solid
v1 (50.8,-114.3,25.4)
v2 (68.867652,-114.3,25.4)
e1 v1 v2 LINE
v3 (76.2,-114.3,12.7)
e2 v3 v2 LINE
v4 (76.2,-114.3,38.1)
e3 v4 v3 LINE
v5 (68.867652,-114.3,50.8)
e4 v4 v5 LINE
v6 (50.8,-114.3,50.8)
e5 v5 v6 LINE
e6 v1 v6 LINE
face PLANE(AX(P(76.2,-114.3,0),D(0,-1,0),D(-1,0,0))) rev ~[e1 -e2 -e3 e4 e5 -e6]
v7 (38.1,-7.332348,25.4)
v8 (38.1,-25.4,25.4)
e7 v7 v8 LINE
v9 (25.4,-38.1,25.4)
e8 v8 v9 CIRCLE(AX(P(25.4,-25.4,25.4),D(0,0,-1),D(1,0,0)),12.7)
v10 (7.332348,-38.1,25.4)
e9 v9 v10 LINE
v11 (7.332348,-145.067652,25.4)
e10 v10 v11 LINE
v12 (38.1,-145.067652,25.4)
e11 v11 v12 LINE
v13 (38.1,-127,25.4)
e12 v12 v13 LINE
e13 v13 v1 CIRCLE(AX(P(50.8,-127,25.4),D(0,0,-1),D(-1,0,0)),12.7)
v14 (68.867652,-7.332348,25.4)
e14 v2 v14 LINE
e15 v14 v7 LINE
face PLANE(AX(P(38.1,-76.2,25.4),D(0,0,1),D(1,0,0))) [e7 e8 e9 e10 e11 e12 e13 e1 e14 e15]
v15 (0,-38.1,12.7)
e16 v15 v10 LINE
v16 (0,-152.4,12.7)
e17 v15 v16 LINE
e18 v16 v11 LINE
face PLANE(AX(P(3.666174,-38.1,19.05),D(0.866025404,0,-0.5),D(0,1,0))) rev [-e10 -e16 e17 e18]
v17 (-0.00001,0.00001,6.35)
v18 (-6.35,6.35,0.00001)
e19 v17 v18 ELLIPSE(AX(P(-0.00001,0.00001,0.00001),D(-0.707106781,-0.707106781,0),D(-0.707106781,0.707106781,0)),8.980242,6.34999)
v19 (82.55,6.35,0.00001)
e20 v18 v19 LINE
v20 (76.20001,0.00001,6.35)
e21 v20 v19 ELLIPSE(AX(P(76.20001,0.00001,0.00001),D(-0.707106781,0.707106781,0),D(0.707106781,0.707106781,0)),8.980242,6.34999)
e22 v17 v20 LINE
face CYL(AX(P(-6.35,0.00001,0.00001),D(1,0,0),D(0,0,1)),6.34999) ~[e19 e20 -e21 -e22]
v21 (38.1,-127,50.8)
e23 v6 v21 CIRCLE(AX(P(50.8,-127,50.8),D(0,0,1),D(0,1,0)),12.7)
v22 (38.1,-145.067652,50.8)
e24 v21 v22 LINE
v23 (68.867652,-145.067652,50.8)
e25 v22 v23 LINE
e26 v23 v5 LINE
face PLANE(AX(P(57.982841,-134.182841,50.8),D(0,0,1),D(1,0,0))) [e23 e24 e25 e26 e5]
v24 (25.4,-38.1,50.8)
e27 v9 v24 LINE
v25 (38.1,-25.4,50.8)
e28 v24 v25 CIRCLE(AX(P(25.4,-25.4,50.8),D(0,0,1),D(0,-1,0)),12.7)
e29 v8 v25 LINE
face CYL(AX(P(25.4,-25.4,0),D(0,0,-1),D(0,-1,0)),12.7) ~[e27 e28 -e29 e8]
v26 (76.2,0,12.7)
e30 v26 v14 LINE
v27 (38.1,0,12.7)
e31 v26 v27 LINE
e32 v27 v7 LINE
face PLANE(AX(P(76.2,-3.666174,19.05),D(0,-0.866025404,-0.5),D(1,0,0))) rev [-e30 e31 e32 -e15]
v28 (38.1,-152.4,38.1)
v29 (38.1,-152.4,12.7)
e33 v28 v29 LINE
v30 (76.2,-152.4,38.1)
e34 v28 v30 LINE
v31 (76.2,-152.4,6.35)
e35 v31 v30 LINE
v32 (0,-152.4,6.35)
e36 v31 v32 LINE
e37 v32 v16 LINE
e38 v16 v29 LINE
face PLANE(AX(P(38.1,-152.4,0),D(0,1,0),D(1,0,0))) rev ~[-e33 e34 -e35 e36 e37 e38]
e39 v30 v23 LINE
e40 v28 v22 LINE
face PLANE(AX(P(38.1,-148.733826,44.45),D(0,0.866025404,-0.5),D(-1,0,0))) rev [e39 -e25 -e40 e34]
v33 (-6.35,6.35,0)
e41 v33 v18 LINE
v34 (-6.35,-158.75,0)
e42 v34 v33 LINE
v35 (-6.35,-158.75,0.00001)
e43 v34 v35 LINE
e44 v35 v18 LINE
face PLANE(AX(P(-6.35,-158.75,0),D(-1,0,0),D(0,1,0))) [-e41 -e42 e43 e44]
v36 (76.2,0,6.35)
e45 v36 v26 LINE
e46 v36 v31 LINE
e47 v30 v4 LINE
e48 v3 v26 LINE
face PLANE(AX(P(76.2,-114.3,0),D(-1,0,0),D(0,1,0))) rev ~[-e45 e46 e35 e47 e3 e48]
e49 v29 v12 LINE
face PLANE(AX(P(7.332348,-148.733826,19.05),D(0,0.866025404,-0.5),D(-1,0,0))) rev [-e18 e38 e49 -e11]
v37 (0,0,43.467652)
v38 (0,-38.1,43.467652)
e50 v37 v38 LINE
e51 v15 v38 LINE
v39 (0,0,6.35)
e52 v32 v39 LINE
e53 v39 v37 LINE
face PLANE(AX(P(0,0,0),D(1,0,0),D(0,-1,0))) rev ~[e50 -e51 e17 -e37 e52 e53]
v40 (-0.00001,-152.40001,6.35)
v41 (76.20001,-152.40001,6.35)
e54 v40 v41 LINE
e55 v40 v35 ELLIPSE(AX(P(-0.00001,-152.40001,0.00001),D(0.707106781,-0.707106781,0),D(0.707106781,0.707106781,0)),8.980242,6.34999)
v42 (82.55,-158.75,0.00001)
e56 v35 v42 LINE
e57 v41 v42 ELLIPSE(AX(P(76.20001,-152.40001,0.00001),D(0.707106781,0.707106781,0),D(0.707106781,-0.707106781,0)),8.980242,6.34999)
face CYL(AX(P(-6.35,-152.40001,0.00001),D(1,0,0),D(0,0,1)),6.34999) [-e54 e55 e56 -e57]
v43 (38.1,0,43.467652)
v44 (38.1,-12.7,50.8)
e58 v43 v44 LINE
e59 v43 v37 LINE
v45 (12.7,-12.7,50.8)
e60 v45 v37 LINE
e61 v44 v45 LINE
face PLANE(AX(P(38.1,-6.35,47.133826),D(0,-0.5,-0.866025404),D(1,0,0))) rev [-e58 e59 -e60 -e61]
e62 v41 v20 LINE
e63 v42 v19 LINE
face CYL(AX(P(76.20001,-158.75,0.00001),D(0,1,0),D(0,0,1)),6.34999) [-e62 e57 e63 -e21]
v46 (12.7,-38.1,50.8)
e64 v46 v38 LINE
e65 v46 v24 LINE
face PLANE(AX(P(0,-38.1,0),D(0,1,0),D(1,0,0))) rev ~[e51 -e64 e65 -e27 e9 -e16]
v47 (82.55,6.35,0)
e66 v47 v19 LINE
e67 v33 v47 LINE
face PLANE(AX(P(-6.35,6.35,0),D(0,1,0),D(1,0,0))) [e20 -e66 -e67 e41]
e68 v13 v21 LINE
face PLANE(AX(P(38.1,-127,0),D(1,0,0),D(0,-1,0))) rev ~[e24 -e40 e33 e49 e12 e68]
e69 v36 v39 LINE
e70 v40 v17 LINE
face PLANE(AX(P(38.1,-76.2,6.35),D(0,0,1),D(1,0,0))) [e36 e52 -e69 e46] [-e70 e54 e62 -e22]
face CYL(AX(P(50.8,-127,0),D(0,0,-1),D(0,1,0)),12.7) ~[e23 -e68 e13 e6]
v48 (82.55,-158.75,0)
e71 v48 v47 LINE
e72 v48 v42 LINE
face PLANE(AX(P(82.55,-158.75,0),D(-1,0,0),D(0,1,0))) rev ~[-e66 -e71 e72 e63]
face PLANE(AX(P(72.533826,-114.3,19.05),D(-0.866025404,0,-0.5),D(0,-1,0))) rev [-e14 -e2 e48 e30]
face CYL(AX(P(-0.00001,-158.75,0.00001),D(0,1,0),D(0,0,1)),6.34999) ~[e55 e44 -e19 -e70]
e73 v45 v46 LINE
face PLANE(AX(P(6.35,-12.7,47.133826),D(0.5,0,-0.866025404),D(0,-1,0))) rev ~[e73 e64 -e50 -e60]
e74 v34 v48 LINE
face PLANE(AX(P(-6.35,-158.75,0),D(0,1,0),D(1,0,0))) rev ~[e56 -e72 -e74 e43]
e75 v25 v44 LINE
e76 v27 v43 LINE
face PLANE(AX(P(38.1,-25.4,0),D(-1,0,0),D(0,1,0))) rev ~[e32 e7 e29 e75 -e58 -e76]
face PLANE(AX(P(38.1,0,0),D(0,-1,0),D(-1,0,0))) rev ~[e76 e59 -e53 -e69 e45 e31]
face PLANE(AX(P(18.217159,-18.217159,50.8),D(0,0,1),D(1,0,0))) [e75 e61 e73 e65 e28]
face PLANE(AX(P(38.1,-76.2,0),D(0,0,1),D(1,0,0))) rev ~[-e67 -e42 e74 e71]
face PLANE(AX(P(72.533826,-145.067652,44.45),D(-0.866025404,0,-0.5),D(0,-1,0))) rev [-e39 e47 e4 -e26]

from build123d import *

# Parameters (mm, degrees)
F0_W        = 88.8999998465
F0_H        = 165.0999998465
F1_DEPTH    = 6.35
F2_DEPTH    = 25.4
F3_DEPTH    = 50.8
F4_R        = 6.34999
F5_C1_SIZE2 = 7.3323484187
F5_C1_SIZE  = 12.7
F5_C2_SIZE2 = 7.3323484187
F5_C2_SIZE  = 12.7
F5_C3_SIZE2 = 12.7
F5_C3_SIZE  = 7.3323484187
F5_C4_SIZE2 = 7.3323484187
F5_C4_SIZE  = 12.7
F5_C5_SIZE2 = 7.3323484187
F5_C5_SIZE  = 12.7
F5_C6_SIZE2 = 7.3323484187
F5_C6_SIZE  = 12.7
F6_SIZE2    = 7.3323484187
F6_SIZE     = 12.7
F6_2_SIZE2  = 7.3323484187
F6_2_SIZE   = 12.7


# Not quite as in the source:
# - a fillet or chamfer is up to 0.001 mm smaller than in the source, because OpenCascade refuses the exact size


with BuildPart() as f1:
    # F0 (on Top) → F1 (new body)
    with BuildSketch(Plane.XY):
        with Locations((38.1, -76.2)):
            Rectangle(F0_W, F0_H)
        Polygon((0, -38.1), (0, 0), (38.1, 0), (76.2, 0), (76.2, -114.3), (76.2, -152.4), (38.1, -152.4), (0, -152.4), align=None, mode=Mode.SUBTRACT)
    extrude(amount=F1_DEPTH)

    # F0 (on Top) → F2 (join)
    with BuildSketch(Plane.XY):
        with BuildLine():
            Line((76.2, 0), (38.1, 0))
            Line((38.1, 0), (38.1, -25.4))
            ThreePointArc((38.1, -25.4), (34.3802561211, -34.3802561211), (25.4, -38.1))
            Line((25.4, -38.1), (0, -38.1))
            Line((0, -38.1), (0, -152.4))
            Line((0, -152.4), (38.1, -152.4))
            Line((38.1, -152.4), (38.1, -127))
            ThreePointArc((38.1, -127), (41.8197438789, -118.0197438789), (50.8, -114.3))
            Line((50.8, -114.3), (76.2, -114.3))
            Line((76.2, -114.3), (76.2, 0))
        make_face()
    extrude(amount=F2_DEPTH)

    # F0 (on Top) → F3 (join)
    with BuildSketch(Plane.XY):
        with BuildLine():
            Line((38.1, 0), (0, 0))
            Line((0, 0), (0, -38.1))
            Line((0, -38.1), (25.4, -38.1))
            ThreePointArc((25.4, -38.1), (34.3802561211, -34.3802561211), (38.1, -25.4))
            Line((38.1, -25.4), (38.1, 0))
        make_face()
        with BuildLine():
            Line((76.2, -152.4), (76.2, -114.3))
            Line((76.2, -114.3), (50.8, -114.3))
            ThreePointArc((50.8, -114.3), (41.8197438789, -118.0197438789), (38.1, -127))
            Line((38.1, -127), (38.1, -152.4))
            Line((38.1, -152.4), (76.2, -152.4))
        make_face()
    extrude(amount=F3_DEPTH)

    # F4 (radius 6.35 in the source; OpenCascade refuses exactly that, so slightly less here)
    f4_edges = [f1.edges().sort_by_distance(p)[0] for p in [
        (38.1, -158.75, 6.35),
        (82.55, -76.2, 6.35),
        (-6.35, -76.2, 6.35),
        (38.1, 6.35, 6.35),
    ]]
    fillet(f4_edges, radius=F4_R)

    # F5: chamfer of 12.7 x 7.3323484187 on 6 edges, made by hand

    # F5_c1
    f5_c1_edges = [f1.edges().sort_by_distance(p)[0] for p in [
        (0, -95.25, 25.4),
    ]]
    f5_c1_side = f1.faces().sort_by_distance((0, -95.25, 25.2533530316))[0]
    chamfer(f5_c1_edges, length=F5_C1_SIZE, length2=F5_C1_SIZE2, reference=f5_c1_side)

    # F5_c2
    f5_c2_edges = [f1.edges().sort_by_distance(p)[0] for p in [
        (57.15, 0, 25.4),
    ]]
    f5_c2_side = f1.faces().sort_by_distance((57.15, 0, 25.2533530316))[0]
    chamfer(f5_c2_edges, length=F5_C2_SIZE, length2=F5_C2_SIZE2, reference=f5_c2_side)

    # F5_c3
    f5_c3_edges = [f1.edges().sort_by_distance(p)[0] for p in [
        (19.05, 0, 50.8),
    ]]
    f5_c3_side = f1.faces().sort_by_distance((19.05, 0, 50.6533530316))[0]
    chamfer(f5_c3_edges, length=F5_C3_SIZE, length2=F5_C3_SIZE2, reference=f5_c3_side)

    # F5_c4
    f5_c4_edges = [f1.edges().sort_by_distance(p)[0] for p in [
        (76.2, -60.8161742094, 25.4),
    ]]
    f5_c4_side = f1.faces().sort_by_distance((76.2, -60.8161742094, 25.2533530316))[0]
    chamfer(f5_c4_edges, length=F5_C4_SIZE, length2=F5_C4_SIZE2, reference=f5_c4_side)

    # F5_c5
    f5_c5_edges = [f1.edges().sort_by_distance(p)[0] for p in [
        (22.7161742094, -152.4, 25.4),
    ]]
    f5_c5_side = f1.faces().sort_by_distance((22.7161742094, -152.4, 25.2533530316))[0]
    chamfer(f5_c5_edges, length=F5_C5_SIZE, length2=F5_C5_SIZE2, reference=f5_c5_side)

    # F5_c6
    f5_c6_edges = [f1.edges().sort_by_distance(p)[0] for p in [
        (57.15, -152.4, 50.8),
    ]]
    f5_c6_side = f1.faces().sort_by_distance((57.15, -152.4, 50.6533530316))[0]
    chamfer(f5_c6_edges, length=F5_C6_SIZE, length2=F5_C6_SIZE2, reference=f5_c6_side)

    # F6
    f6_edges = [f1.edges().sort_by_distance(p)[0] for p in [
        (0, -25.4, 50.8),
    ]]
    f6_side = f1.faces().sort_by_distance((18.448591, -25.034136, 50.8))[0]
    chamfer(f6_edges, length=F6_SIZE, length2=F6_SIZE2, reference=f6_side)

    # F6#2
    f6_2_edges = [f1.edges().sort_by_distance(p)[0] for p in [
        (76.2, -129.683826, 50.8),
    ]]
    f6_2_side = f1.faces().sort_by_distance((76.2, -129.683826, 49.2125))[0]
    chamfer(f6_2_edges, length=F6_2_SIZE, length2=F6_2_SIZE2, reference=f6_2_side)


solid = f1.part
